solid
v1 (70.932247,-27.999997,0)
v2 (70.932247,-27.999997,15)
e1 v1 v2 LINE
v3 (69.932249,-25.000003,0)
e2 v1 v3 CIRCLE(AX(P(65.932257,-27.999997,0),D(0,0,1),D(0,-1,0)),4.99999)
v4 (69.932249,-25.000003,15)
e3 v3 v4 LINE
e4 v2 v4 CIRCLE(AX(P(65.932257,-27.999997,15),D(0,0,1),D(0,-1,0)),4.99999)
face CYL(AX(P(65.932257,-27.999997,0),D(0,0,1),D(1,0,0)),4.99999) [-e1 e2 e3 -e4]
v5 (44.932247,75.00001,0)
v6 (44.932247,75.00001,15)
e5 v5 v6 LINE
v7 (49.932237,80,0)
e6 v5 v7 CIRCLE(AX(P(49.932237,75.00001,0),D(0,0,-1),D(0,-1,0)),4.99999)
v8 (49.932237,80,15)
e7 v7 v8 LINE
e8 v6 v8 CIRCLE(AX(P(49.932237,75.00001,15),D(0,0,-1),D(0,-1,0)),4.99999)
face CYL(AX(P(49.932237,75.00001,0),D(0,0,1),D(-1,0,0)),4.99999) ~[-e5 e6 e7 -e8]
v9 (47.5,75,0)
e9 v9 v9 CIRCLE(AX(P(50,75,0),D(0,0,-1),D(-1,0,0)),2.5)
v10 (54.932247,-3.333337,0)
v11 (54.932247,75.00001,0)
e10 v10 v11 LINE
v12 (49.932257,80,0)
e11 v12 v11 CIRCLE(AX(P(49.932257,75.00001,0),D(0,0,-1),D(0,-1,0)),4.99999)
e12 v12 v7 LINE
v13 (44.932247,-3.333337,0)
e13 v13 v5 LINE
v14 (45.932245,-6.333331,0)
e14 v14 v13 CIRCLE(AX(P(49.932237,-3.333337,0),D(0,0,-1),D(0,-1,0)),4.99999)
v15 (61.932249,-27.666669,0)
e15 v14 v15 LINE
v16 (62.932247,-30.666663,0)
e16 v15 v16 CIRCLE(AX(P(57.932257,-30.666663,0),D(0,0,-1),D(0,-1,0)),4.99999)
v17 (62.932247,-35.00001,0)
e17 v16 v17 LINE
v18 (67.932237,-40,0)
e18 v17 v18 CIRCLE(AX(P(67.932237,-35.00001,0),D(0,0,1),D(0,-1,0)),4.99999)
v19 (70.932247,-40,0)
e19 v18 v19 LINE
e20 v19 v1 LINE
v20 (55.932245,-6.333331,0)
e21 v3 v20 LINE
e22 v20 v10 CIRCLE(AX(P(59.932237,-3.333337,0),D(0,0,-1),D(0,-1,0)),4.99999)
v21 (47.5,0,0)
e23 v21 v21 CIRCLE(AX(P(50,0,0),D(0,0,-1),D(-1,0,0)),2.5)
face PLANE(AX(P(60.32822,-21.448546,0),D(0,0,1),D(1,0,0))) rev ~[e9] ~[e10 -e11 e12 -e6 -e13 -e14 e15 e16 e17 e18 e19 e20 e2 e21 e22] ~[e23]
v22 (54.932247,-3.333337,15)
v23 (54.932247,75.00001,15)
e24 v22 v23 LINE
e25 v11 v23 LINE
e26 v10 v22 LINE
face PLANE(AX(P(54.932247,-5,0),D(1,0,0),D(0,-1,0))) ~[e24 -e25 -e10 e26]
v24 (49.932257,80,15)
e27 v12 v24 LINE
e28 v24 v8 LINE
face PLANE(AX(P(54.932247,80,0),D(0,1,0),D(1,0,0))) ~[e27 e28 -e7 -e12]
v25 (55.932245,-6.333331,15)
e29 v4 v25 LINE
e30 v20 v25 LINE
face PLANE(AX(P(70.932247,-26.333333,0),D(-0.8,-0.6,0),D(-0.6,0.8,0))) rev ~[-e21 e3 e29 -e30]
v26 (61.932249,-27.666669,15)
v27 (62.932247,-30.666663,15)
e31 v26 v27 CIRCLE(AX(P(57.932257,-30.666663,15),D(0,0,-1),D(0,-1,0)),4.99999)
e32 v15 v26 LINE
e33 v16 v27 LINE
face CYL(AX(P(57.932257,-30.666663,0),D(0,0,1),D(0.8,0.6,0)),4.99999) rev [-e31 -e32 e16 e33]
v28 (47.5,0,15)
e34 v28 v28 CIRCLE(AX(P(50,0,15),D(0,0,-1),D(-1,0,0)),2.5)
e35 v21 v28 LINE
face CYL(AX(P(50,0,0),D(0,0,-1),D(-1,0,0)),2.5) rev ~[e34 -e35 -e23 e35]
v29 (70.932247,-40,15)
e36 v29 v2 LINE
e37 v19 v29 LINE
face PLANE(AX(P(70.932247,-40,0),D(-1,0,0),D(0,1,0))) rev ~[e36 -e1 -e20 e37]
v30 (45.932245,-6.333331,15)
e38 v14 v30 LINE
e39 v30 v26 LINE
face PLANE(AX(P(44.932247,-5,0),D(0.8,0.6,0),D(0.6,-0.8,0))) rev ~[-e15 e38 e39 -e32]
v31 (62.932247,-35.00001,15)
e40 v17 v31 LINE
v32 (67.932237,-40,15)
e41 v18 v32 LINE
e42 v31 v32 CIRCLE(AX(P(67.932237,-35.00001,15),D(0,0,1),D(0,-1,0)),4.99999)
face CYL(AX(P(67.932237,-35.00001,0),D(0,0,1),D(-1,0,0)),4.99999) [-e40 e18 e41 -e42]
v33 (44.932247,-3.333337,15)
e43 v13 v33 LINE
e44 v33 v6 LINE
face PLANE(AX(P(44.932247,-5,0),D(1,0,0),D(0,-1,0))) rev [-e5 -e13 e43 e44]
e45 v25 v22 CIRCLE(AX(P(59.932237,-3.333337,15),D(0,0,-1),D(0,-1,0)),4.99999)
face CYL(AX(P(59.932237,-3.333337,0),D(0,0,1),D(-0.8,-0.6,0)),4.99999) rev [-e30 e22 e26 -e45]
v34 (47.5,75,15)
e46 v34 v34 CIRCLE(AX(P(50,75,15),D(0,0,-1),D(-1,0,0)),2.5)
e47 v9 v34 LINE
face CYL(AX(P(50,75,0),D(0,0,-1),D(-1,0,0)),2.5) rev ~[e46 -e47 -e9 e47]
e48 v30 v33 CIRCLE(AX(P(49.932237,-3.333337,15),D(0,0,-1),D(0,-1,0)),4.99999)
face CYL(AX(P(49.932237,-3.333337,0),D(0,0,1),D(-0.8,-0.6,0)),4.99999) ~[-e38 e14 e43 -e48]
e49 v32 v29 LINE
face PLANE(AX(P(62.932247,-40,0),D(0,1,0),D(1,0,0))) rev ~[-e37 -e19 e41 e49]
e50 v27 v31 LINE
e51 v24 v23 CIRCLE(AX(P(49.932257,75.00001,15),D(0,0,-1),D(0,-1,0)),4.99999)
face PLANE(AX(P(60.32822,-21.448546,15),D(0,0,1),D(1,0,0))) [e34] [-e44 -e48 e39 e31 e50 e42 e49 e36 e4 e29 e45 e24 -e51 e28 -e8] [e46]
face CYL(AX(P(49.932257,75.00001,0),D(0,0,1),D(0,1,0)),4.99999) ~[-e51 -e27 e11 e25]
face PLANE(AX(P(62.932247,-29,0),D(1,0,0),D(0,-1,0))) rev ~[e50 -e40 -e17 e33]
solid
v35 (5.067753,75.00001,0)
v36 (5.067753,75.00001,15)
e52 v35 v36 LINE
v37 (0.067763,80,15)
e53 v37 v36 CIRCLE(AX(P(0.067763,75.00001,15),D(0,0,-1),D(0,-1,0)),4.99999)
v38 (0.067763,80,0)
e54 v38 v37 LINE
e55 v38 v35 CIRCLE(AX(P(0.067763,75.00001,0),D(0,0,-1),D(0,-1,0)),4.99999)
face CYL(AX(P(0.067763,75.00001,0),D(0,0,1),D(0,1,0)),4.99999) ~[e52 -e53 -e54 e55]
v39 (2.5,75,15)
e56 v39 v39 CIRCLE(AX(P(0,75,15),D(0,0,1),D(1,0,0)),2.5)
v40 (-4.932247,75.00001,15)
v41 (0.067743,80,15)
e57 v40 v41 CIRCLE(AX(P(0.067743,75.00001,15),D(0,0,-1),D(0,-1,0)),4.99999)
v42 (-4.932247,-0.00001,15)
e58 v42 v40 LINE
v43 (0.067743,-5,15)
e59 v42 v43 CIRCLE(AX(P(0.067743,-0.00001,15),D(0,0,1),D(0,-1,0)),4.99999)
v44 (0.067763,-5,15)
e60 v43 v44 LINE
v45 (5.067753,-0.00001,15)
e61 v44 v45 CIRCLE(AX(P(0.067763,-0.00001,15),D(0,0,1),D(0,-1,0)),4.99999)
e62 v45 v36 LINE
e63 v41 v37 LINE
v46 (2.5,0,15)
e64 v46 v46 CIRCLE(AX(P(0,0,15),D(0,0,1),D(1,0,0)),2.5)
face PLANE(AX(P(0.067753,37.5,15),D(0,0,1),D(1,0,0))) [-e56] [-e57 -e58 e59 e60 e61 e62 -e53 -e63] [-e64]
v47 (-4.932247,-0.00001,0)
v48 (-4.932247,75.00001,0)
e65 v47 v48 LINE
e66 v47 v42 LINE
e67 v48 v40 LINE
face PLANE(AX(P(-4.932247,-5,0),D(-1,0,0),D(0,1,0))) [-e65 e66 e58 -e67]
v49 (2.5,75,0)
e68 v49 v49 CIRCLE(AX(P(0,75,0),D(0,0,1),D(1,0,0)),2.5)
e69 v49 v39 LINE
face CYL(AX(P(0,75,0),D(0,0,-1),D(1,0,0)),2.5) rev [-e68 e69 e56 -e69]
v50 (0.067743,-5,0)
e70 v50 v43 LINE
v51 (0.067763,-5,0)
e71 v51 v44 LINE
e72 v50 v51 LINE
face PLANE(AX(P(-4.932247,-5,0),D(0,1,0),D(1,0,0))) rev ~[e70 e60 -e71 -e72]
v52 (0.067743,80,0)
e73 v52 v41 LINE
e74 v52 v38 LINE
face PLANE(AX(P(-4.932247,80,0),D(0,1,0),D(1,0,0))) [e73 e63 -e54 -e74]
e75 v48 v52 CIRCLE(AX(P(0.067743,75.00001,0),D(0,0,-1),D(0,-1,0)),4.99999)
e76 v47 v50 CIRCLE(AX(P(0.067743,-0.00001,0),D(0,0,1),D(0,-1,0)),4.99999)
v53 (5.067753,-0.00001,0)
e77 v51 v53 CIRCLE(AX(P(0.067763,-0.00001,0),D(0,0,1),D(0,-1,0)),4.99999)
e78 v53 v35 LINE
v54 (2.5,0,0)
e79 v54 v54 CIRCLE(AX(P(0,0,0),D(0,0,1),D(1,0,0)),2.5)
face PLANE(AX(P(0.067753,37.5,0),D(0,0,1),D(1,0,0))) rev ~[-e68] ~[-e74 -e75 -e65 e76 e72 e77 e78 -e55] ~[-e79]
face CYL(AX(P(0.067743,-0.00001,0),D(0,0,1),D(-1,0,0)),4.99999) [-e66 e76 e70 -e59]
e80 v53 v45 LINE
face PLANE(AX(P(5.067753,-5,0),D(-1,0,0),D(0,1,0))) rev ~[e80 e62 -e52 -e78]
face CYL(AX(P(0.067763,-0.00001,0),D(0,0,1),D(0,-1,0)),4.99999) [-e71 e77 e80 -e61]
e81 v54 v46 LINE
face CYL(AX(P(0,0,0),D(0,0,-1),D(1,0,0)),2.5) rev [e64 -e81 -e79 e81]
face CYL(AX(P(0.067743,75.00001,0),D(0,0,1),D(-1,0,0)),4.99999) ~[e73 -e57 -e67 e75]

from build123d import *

# Parameters (mm, degrees)
F0_W     = 10
F0_H     = 85
F0_R     = 2.5
F1_DEPTH = 15
F5_DEPTH = 15
F6_R     = 4.99999
F6_2_R   = 4.99999


# Not quite as in the source:
# - a fillet or chamfer is up to 0.001 mm smaller than in the source, because OpenCascade refuses the exact size


with BuildPart() as f1:
    # F0 (on Top) → F1 (new body)
    with BuildSketch(Plane.XY):
        with Locations((0.0677526742, 37.5)):
            Rectangle(F0_W, F0_H)
        Circle(F0_R, mode=Mode.SUBTRACT)
        with Locations((0, 75)):
            Circle(F0_R, mode=Mode.SUBTRACT)
    extrude(amount=F1_DEPTH)


with BuildPart() as f3_1:
    # F3: instance of F1
    add(f1.part.mirror(Plane.YZ.offset(25)))

    # F4 (on Top) → F5 (join)
    with BuildSketch(Plane.XY):
        Polygon((54.9322473258, -5), (44.9322473258, -5), (62.9322473258, -29), (62.9322473258, -40), (70.9322473258, -40), (70.9322473258, -26.3333333333), align=None)
    extrude(amount=F5_DEPTH)

    # F6#2 (radius 5 in the source; OpenCascade refuses exactly that, so slightly less here)
    f6_2_edges = [f3_1.edges().sort_by_distance(p)[0] for p in [
        (44.932247, -5, 7.5),
        (70.932247, -26.333333, 7.5),
        (62.932247, -29, 7.5),
        (54.932247, -5, 7.5),
        (54.932247, 80, 7.5),
        (44.932247, 80, 7.5),
        (62.932247, -40, 7.5),
    ]]
    fillet(f6_2_edges, radius=F6_2_R)


with BuildPart() as f1_1:
    add(f1.part)

    # F6 (radius 5 in the source; OpenCascade refuses exactly that, so slightly less here)
    f6_edges = [f1_1.edges().sort_by_distance(p)[0] for p in [
        (5.067753, -5, 7.5),
        (-4.932247, -5, 7.5),
        (5.067753, 80, 7.5),
        (-4.932247, 80, 7.5),
    ]]
    fillet(f6_edges, radius=F6_R)


solid = Compound([f3_1.part, f1_1.part])
